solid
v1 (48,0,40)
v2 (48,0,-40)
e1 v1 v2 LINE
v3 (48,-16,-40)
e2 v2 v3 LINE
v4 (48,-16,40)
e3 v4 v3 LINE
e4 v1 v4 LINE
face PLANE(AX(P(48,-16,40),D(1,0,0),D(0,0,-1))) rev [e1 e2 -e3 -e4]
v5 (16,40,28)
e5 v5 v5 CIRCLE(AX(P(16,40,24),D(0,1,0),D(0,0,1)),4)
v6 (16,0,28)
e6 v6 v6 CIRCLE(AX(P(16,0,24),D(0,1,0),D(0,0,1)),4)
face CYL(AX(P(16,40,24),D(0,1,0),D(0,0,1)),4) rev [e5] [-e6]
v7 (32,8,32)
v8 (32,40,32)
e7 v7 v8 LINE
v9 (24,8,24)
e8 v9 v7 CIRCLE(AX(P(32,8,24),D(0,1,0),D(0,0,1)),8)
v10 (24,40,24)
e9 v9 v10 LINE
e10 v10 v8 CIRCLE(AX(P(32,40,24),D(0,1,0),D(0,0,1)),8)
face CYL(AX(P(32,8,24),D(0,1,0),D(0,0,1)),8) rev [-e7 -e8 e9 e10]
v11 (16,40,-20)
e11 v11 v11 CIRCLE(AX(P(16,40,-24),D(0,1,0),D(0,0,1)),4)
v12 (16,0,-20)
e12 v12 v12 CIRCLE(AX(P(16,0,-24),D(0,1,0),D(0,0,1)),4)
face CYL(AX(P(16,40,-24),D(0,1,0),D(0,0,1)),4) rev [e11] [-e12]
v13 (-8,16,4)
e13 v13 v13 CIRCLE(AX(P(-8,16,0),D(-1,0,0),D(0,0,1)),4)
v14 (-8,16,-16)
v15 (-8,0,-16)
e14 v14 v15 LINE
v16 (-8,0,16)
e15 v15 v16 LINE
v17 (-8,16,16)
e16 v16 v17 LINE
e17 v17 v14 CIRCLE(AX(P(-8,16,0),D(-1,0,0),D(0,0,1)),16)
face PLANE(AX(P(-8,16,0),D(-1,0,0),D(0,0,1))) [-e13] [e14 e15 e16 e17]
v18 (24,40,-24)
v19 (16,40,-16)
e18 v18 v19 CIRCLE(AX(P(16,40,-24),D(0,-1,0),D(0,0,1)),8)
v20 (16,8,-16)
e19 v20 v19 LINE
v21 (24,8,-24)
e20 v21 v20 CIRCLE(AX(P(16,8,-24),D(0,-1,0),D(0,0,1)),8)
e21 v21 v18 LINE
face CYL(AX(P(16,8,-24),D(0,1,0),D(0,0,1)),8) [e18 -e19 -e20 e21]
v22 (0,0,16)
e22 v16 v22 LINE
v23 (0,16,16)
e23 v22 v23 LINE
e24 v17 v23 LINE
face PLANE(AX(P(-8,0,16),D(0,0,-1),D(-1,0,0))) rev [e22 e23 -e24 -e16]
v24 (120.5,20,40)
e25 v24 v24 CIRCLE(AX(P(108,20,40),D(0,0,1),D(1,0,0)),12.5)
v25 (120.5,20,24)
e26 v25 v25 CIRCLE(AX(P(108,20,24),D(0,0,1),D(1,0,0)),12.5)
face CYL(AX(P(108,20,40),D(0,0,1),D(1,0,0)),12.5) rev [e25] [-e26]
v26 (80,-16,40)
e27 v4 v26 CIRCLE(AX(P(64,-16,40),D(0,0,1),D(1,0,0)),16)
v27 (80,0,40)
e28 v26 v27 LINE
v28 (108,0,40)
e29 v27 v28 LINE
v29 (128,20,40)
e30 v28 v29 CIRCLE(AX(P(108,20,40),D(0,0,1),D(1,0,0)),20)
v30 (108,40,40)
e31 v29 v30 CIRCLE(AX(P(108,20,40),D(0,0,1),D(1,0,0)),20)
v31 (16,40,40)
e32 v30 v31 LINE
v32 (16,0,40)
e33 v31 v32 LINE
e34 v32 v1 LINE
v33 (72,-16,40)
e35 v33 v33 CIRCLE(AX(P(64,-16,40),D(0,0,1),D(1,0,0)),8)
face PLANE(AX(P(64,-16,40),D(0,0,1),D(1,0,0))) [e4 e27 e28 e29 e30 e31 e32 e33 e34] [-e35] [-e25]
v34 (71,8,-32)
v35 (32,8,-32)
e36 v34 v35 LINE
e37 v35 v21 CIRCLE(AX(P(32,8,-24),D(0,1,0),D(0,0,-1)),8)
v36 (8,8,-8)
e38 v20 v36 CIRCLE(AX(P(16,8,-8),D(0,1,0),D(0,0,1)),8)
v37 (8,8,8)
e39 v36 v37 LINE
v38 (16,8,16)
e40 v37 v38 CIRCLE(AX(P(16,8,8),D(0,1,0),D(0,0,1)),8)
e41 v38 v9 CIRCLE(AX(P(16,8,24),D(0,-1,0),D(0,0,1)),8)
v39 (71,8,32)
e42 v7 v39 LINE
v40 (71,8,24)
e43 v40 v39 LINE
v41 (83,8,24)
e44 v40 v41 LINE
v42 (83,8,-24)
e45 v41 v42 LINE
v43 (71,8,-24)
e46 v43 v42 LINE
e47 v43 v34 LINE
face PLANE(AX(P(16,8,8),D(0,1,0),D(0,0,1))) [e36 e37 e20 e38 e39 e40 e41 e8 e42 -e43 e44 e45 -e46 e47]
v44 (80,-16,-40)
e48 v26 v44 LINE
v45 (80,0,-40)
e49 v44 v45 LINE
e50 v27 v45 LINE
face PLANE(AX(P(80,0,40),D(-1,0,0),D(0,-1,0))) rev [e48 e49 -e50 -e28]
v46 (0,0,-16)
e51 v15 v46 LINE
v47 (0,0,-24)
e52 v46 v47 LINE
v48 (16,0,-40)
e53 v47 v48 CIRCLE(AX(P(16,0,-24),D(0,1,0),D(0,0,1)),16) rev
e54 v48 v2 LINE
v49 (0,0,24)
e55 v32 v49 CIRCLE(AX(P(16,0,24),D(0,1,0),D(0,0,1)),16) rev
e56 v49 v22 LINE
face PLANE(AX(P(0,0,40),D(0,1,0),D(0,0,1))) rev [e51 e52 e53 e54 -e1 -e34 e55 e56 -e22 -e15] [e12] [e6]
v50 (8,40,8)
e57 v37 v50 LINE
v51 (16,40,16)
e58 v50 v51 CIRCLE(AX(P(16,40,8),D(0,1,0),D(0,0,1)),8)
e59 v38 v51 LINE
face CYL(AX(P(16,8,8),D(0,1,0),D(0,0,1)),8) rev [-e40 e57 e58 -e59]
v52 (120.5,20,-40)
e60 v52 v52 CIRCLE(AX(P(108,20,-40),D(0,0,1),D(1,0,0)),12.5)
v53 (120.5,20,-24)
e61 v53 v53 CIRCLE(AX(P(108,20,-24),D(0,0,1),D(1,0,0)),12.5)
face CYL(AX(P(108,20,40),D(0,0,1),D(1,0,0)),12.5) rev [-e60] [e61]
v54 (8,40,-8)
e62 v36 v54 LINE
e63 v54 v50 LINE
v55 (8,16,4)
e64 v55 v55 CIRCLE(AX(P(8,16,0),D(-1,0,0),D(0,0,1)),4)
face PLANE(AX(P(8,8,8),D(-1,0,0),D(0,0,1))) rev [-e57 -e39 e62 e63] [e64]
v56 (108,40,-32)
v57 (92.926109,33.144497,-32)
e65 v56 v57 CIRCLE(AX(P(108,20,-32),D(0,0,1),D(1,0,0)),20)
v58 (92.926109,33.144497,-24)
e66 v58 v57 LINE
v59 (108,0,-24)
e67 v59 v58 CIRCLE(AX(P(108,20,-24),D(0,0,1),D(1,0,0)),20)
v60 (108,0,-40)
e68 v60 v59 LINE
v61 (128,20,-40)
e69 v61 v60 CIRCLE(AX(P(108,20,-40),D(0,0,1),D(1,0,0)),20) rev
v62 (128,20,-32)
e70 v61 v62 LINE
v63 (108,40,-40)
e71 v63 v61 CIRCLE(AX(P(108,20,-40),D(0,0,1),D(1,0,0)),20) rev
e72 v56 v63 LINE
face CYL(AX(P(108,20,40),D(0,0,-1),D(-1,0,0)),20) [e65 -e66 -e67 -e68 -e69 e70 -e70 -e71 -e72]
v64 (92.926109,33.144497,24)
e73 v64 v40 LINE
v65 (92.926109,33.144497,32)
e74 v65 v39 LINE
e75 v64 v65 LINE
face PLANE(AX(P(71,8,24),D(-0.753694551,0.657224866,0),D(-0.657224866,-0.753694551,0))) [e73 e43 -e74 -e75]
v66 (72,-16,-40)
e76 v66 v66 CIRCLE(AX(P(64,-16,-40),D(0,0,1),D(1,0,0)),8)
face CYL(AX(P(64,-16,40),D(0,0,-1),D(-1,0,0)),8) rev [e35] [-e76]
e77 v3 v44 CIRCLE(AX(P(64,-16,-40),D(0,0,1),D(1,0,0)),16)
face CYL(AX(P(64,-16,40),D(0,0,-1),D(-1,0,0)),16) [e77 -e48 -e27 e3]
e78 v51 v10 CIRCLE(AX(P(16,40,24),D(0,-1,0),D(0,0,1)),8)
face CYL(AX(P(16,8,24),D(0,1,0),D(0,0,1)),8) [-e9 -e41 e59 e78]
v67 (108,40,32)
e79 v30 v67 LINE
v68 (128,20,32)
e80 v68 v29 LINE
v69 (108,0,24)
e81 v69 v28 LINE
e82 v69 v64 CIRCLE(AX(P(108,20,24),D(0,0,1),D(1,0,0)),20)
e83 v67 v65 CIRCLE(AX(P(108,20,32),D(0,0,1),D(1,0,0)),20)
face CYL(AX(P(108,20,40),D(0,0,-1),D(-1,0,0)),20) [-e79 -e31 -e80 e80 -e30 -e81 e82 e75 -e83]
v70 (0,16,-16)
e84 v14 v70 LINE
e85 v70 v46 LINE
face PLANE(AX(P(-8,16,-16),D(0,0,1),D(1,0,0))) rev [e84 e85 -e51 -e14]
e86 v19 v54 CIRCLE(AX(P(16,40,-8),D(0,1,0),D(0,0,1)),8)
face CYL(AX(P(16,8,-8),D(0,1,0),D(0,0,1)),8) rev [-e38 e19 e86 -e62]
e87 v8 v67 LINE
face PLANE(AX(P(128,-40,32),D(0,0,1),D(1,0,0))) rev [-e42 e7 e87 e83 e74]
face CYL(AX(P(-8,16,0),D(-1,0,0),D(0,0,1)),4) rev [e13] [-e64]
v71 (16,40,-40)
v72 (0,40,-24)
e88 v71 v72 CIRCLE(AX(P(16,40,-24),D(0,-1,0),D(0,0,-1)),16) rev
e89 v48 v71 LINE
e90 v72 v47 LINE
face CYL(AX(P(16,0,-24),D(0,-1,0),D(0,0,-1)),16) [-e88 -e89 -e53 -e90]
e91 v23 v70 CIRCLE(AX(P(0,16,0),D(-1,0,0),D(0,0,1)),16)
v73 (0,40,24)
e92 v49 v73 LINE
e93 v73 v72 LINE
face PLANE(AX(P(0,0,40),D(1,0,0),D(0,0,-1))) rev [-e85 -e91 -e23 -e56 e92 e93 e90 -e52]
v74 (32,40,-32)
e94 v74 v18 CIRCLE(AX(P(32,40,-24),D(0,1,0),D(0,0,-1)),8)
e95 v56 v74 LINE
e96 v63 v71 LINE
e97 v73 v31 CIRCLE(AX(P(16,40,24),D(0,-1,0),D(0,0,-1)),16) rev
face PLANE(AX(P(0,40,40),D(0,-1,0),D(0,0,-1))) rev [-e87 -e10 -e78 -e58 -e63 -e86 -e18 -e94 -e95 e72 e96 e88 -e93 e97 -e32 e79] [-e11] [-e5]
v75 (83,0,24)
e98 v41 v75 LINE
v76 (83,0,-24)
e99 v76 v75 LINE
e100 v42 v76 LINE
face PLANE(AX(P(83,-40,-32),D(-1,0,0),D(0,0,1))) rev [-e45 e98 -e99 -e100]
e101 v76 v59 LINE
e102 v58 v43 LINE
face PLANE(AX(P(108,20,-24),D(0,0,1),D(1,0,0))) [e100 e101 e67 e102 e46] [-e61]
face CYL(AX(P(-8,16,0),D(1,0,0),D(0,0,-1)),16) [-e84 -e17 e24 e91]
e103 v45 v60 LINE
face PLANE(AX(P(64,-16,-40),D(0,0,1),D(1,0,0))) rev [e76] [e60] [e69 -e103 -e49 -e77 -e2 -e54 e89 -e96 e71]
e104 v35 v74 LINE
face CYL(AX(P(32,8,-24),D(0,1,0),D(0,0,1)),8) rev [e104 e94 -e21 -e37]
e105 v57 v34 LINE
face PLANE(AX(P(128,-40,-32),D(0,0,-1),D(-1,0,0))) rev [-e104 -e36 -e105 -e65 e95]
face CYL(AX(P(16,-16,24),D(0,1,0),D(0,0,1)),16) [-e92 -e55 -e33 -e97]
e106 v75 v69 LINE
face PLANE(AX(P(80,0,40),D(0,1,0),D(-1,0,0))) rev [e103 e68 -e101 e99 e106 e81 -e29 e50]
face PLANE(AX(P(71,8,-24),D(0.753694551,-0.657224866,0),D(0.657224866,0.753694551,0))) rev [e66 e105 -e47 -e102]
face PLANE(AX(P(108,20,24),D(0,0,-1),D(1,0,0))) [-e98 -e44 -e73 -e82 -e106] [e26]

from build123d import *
from build123d.topology import SkipClean

# Parameters (mm, degrees)
SKETCH1_R           = 8
BOSS_EXTRUDE1_DEPTH = 40
SKETCH2_W           = 45
SKETCH2_H           = 64
CUT_EXTRUDE1_DEPTH  = 80
FILLET1_R           = 20
HOLE1_D             = 25
FILLET2_R           = 16
HOLE2_D             = 8
CUT_EXTRUDE2_DEPTH  = 32
SKETCH8_R           = 12.5
BOSS_EXTRUDE2_DEPTH = 8
BOSS_EXTRUDE3_DEPTH = 8
HOLE3_D             = 8


with BuildPart() as part:
    # Sketch1 → Boss-Extrude1 (new, symmetric)
    with BuildSketch(Plane.XY):
        with BuildLine():
            Line((48, -16), (48, 0))
            Line((48, 0), (0, 0))
            Line((0, 0), (0, 40))
            Line((0, 40), (128, 40))
            Line((128, 40), (128, 0))
            Line((128, 0), (80, 0))
            Line((80, 0), (80, -16))
            ThreePointArc((80, -16), (64, -32), (48, -16))
        make_face()
        with Locations((64, -16)):
            Circle(SKETCH1_R, mode=Mode.SUBTRACT)
    extrude(amount=BOSS_EXTRUDE1_DEPTH, both=True)

    # Sketch2 → Cut-Extrude1 (cut)
    with BuildSketch(Plane(origin=(0, 40, 0), x_dir=(1, 0, 0), z_dir=(0, 1, 0))):
        with Locations((105.5, 0)):
            Rectangle(SKETCH2_W, SKETCH2_H)
    extrude(amount=-CUT_EXTRUDE1_DEPTH, mode=Mode.SUBTRACT)

    # Fillet1
    fillet1_edges = [part.edges().sort_by_distance(p)[0] for p in [
        (128, 0, 36),
        (128, 0, -36),
        (128, 40, -36),
        (128, 40, 36),
    ]]
    fillet(fillet1_edges, radius=FILLET1_R - 0.0001)  # a hair under: the kernel refuses the full size

    # Hole1 (through all)
    with Locations(Plane.XY.offset(40)):
        with Locations((108, 20)):
            Hole(HOLE1_D / 2)

    # Fillet2
    fillet2_edges = [part.edges().sort_by_distance(p)[0] for p in [
        (0, 20, -40),
        (0, 20, 40),
    ]]
    fillet(fillet2_edges, radius=FILLET2_R)

    # Hole2 (through all)
    with Locations(Plane(origin=(0, 40, 0), x_dir=(1, 0, 0), z_dir=(0, 1, 0))):
        with Locations((16, 24), (16, -24)):
            Hole(HOLE2_D / 2)

    # Sketch7 → Cut-Extrude2 (cut)
    with BuildSketch(Plane(origin=(0, 40, 0), x_dir=(1, 0, 0), z_dir=(0, 1, 0))):
        with BuildLine():
            Line((8, -8), (8, 8))
            ThreePointArc((8, 8), (10.343145751, 13.656854249), (16, 16))
            ThreePointArc((16, 16), (21.656854249, 18.343145751), (24, 24))
            ThreePointArc((24, 24), (26.343145751, 29.656854249), (32, 32))
            Line((32, 32), (83, 32))
            Line((83, 32), (83, -32))
            Line((83, -32), (32, -32))
            ThreePointArc((32, -32), (26.343145751, -29.656854249), (24, -24))
            ThreePointArc((24, -24), (21.656854249, -18.343145751), (16, -16))
            ThreePointArc((16, -16), (10.343145751, -13.656854249), (8, -8))
        make_face()
    extrude(amount=-CUT_EXTRUDE2_DEPTH, mode=Mode.SUBTRACT)

    # Sketch8 → Boss-Extrude2 (add)
    with SkipClean():  # the faces are left unmerged after this step: merging them gives an invalid solid
        with BuildSketch(Plane.XY.offset(-32)):
            with BuildLine():
                Line((83, 8), (71, 8))
                Line((71, 8), (92.926108981, 33.14449731))
                ThreePointArc((92.926108981, 33.14449731), (126.205630258, 28.279796308), (108, 0))
                Line((108, 0), (83, 0))
                Line((83, 0), (83, 8))
            make_face()
            with Locations((108, 20)):
                Circle(SKETCH8_R, mode=Mode.SUBTRACT)
        boss_extrude2 = extrude(amount=BOSS_EXTRUDE2_DEPTH)
    add(part.part.scale(1), mode=Mode.REPLACE)  # the faces are merged on a copy

    # Mirror1: Boss-Extrude2 across plane
    add(boss_extrude2.mirror(Plane.XY))

    # Sketch9 → Boss-Extrude3 (add)
    with BuildSketch(Plane.ZY):
        with BuildLine():
            Line((-16, 16), (-16, 0))
            Line((-16, 0), (16, 0))
            Line((16, 0), (16, 16))
            ThreePointArc((16, 16), (0, 32), (-16, 16))
        make_face()
    extrude(amount=BOSS_EXTRUDE3_DEPTH)

    # Hole3 (through all)
    with Locations(Plane.ZY.offset(8)):
        with Locations((0, 16)):
            Hole(HOLE3_D / 2)


solid = part.part
